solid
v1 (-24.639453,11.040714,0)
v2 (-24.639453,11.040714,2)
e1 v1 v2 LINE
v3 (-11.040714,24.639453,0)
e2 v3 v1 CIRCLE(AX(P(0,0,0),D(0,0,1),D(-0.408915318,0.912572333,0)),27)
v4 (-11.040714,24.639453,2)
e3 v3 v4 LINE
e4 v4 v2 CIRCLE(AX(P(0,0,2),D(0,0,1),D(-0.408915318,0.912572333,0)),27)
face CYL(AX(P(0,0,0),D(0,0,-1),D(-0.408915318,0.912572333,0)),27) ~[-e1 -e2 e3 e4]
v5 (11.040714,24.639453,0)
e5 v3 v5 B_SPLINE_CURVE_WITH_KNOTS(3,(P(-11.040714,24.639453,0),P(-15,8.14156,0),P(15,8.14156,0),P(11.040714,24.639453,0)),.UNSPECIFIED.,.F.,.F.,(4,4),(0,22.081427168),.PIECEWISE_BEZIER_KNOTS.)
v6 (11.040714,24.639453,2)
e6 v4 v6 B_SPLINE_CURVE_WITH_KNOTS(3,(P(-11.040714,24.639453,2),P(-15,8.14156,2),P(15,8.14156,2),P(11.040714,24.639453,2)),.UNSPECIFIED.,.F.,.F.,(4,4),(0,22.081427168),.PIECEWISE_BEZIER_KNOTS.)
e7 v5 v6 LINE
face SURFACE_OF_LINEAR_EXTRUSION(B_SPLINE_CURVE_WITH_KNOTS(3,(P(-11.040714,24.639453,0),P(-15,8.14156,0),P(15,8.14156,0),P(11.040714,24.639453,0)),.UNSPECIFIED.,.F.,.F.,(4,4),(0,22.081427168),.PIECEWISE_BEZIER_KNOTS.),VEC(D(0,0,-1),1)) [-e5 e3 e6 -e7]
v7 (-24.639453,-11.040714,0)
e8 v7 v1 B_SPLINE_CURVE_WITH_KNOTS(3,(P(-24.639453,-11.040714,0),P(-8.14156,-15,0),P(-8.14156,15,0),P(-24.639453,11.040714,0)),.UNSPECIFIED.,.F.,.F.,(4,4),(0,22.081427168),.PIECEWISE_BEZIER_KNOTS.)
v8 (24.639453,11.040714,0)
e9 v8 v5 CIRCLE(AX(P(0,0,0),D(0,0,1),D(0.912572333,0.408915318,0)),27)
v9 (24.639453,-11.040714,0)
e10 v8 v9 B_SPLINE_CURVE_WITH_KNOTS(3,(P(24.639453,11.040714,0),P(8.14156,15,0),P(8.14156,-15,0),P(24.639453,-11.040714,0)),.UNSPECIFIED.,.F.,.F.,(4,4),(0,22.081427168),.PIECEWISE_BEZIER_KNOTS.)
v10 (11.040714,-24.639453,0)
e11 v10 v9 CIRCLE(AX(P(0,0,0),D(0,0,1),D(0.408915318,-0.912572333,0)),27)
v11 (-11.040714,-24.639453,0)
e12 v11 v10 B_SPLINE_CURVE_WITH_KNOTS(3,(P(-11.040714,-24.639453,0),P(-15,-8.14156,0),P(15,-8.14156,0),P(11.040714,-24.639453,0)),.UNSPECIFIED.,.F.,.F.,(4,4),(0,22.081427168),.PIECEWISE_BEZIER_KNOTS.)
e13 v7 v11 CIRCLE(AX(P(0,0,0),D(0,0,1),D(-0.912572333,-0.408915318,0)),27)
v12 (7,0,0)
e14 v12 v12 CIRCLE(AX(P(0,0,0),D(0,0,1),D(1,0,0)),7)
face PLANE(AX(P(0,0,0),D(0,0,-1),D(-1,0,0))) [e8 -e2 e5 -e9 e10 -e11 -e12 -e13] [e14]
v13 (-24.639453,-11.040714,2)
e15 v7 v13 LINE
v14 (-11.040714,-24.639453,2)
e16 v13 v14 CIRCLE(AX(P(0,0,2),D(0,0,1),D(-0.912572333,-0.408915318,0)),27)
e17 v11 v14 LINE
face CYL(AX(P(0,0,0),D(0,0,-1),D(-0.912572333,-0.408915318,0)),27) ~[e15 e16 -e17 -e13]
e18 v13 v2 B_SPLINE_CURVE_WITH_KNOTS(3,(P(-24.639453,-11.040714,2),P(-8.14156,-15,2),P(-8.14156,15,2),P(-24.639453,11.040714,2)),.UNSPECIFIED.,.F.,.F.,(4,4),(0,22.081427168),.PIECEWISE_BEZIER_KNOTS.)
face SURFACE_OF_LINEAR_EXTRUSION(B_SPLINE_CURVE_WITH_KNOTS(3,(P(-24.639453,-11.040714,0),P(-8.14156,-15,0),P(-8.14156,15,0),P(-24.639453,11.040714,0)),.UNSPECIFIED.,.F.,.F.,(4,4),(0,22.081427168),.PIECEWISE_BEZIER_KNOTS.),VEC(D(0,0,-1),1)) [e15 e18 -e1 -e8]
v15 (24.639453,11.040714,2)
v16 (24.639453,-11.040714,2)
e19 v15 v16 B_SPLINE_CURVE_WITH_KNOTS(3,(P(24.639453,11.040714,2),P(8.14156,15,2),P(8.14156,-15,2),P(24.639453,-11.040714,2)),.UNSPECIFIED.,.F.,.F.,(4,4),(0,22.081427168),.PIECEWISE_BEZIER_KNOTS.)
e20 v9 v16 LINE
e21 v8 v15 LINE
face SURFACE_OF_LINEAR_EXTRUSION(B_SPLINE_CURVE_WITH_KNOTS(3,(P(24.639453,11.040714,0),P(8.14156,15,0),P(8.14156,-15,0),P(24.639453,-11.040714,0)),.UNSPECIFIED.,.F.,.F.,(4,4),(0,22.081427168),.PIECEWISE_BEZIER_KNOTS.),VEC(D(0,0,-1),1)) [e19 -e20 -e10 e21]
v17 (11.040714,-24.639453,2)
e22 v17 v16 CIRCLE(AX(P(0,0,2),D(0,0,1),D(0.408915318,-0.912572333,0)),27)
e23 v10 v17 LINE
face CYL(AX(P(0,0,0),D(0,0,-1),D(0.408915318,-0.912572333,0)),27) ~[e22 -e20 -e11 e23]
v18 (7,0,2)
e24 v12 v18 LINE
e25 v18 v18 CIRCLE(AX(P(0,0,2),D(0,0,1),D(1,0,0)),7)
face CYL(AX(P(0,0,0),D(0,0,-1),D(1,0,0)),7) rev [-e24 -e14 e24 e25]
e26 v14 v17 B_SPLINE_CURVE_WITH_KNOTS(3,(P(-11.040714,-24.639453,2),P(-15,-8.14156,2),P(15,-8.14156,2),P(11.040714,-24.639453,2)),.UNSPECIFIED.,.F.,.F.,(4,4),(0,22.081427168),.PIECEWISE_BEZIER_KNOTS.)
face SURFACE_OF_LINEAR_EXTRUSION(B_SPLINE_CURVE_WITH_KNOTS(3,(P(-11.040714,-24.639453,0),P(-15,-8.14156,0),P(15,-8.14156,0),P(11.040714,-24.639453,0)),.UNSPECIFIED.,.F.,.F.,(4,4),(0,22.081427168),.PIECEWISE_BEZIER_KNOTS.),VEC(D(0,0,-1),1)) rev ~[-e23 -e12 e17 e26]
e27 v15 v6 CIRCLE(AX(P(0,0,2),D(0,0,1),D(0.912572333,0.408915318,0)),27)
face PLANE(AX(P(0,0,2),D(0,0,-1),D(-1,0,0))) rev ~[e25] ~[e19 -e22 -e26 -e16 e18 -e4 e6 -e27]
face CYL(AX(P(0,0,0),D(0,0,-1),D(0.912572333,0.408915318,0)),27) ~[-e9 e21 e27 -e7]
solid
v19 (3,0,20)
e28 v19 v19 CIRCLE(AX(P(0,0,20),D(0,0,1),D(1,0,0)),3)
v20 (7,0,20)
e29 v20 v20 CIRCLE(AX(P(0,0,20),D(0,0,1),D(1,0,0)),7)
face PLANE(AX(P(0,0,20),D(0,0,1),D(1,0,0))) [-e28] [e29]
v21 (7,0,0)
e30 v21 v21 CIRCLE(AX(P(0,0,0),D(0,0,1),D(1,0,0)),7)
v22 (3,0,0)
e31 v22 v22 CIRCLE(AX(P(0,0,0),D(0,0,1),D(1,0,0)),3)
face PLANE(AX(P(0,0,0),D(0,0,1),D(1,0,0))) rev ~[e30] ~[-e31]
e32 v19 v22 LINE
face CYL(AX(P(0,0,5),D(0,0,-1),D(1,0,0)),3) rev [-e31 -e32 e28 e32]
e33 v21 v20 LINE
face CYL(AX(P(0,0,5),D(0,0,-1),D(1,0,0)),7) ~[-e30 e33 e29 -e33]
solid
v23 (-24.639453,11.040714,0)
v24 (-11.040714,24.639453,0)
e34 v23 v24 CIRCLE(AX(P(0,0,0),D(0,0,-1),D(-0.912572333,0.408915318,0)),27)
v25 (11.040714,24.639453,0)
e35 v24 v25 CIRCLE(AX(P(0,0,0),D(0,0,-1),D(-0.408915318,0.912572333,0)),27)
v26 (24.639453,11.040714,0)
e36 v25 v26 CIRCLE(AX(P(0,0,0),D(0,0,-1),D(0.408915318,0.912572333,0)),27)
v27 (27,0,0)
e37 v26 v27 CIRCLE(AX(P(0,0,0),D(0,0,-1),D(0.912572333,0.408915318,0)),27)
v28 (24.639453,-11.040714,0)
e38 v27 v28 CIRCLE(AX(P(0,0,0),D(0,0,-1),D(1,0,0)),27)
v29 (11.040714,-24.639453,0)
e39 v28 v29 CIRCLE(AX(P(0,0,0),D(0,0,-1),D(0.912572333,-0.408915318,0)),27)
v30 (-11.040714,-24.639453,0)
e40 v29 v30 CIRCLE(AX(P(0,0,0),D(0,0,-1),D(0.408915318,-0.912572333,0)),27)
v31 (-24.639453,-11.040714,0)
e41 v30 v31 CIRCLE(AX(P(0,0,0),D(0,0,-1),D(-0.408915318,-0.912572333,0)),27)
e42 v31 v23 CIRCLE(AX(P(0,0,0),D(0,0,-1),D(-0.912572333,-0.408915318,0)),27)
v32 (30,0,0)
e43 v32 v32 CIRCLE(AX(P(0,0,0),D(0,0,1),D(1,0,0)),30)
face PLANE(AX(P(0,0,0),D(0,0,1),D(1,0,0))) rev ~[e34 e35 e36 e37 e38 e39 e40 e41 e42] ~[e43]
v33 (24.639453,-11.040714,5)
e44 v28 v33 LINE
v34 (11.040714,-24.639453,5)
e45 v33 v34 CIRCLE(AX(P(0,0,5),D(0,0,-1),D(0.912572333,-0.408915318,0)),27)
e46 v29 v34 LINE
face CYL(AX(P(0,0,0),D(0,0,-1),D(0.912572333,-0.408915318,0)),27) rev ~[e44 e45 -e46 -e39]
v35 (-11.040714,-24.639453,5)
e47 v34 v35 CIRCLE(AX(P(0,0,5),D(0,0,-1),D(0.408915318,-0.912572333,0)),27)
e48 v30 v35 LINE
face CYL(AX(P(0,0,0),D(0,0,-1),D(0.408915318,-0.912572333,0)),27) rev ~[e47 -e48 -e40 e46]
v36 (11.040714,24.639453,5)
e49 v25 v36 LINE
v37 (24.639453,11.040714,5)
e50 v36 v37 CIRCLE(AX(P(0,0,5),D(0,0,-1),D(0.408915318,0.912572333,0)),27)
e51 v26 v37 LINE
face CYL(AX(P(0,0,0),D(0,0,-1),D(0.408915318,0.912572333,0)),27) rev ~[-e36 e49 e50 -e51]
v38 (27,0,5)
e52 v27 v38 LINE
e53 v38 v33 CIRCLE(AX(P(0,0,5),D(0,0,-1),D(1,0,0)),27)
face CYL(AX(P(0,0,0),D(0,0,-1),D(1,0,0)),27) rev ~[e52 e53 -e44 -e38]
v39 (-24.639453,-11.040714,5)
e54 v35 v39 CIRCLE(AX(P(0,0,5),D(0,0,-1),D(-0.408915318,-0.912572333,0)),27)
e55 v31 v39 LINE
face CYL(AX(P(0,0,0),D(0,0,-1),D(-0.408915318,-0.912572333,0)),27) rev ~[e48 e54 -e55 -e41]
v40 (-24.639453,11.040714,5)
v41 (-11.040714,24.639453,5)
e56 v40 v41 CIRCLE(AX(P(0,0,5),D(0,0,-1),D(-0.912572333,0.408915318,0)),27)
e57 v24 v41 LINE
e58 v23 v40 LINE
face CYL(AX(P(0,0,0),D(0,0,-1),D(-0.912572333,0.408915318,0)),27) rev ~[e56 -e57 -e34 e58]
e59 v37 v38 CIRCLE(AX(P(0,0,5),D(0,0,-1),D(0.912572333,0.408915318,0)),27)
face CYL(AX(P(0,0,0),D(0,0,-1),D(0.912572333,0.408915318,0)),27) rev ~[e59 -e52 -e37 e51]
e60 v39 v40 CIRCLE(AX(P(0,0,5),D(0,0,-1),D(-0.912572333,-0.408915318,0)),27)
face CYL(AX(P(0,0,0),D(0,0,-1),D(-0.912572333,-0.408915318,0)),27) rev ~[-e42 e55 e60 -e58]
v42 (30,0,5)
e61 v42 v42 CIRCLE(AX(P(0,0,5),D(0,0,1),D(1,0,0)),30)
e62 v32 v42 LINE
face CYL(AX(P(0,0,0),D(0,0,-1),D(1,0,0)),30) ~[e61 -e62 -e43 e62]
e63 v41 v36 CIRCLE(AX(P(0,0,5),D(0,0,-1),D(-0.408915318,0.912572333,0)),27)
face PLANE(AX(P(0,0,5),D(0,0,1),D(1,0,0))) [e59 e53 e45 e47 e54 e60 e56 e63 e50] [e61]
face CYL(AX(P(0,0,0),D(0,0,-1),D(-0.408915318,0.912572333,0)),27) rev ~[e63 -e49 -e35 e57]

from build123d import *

# Parameters (mm, degrees)
F0_R     = 30
F1_DEPTH = 5
F0_R_2   = 7
F0_R_3   = 3
F2_DEPTH = 2
F3_DEPTH = 15


# Not quite as in the source:
# - a feature names something its author has since deleted; it is built from what else it names


with BuildPart() as f1:
    # F0 (on Top) → F1 (new body)
    with BuildSketch(Plane.XY):
        Circle(F0_R)
        with BuildLine():
            ThreePointArc((24.6394529882, 11.040713584), (26.4032690275, 5.6451204292), (27, 0))
            ThreePointArc((27, 0), (26.4032690275, -5.6451204292), (24.6394529882, -11.040713584))
            ThreePointArc((24.6394529882, -11.040713584), (19.091883092, -19.091883092), (11.040713584, -24.6394529882))
            ThreePointArc((11.040713584, -24.6394529882), (0, -27), (-11.040713584, -24.6394529882))
            ThreePointArc((-11.040713584, -24.6394529882), (-19.091883092, -19.091883092), (-24.6394529882, -11.040713584))
            ThreePointArc((-24.6394529882, -11.040713584), (-27, 0), (-24.6394529882, 11.040713584))
            ThreePointArc((-24.6394529882, 11.040713584), (-19.091883092, 19.091883092), (-11.040713584, 24.6394529882))
            ThreePointArc((-11.040713584, 24.6394529882), (0, 27), (11.040713584, 24.6394529882))
            ThreePointArc((11.040713584, 24.6394529882), (19.091883092, 19.091883092), (24.6394529882, 11.040713584))
        make_face(mode=Mode.SUBTRACT)
    extrude(amount=F1_DEPTH)


with BuildPart() as f1b:
    # F0 (on Top) → F1, piece 2 (new body)
    with BuildSketch(Plane.XY):
        Circle(F0_R_2)
        Circle(F0_R_3, mode=Mode.SUBTRACT)
    extrude(amount=F1_DEPTH)

    # F3 (add): a face of the model
    f3_faces = [f1b.faces().sort_by_distance(p)[0] for p in [
        (-6.8020101013, 0, 5),
    ]]
    extrude(f3_faces, amount=F3_DEPTH)


with BuildPart() as f2:
    # F0 (on Top) → F2 (new body)
    with BuildSketch(Plane.XY):
        with BuildLine():
            add(Edge.make_bspline(
                [(24.6394529882, 11.040713584), (8.1415599535, 15), (8.1415599535, -15), (24.6394529882, -11.040713584)],
                knots=[0, 0, 0, 0, 22.081427168, 22.081427168, 22.081427168, 22.081427168], degree=3))
            ThreePointArc((24.6394529882, 11.040713584), (19.091883092, 19.091883092), (11.040713584, 24.6394529882))
            add(Edge.make_bspline(
                [(-11.040713584, 24.6394529882), (-15, 8.1415599535), (15, 8.1415599535), (11.040713584, 24.6394529882)],
                knots=[0, 0, 0, 0, 22.081427168, 22.081427168, 22.081427168, 22.081427168], degree=3))
            ThreePointArc((-11.040713584, 24.6394529882), (-19.091883092, 19.091883092), (-24.6394529882, 11.040713584))
            add(Edge.make_bspline(
                [(-24.6394529882, -11.040713584), (-8.1415599535, -15), (-8.1415599535, 15), (-24.6394529882, 11.040713584)],
                knots=[0, 0, 0, 0, 22.081427168, 22.081427168, 22.081427168, 22.081427168], degree=3))
            ThreePointArc((-24.6394529882, -11.040713584), (-19.091883092, -19.091883092), (-11.040713584, -24.6394529882))
            add(Edge.make_bspline(
                [(-11.040713584, -24.6394529882), (-15, -8.1415599535), (15, -8.1415599535), (11.040713584, -24.6394529882)],
                knots=[0, 0, 0, 0, 22.081427168, 22.081427168, 22.081427168, 22.081427168], degree=3))
            ThreePointArc((11.040713584, -24.6394529882), (19.091883092, -19.091883092), (24.6394529882, -11.040713584))
        make_face()
        Circle(F0_R_2, mode=Mode.SUBTRACT)
    extrude(amount=F2_DEPTH)


solid = Compound([f1.part, f1b.part, f2.part])
